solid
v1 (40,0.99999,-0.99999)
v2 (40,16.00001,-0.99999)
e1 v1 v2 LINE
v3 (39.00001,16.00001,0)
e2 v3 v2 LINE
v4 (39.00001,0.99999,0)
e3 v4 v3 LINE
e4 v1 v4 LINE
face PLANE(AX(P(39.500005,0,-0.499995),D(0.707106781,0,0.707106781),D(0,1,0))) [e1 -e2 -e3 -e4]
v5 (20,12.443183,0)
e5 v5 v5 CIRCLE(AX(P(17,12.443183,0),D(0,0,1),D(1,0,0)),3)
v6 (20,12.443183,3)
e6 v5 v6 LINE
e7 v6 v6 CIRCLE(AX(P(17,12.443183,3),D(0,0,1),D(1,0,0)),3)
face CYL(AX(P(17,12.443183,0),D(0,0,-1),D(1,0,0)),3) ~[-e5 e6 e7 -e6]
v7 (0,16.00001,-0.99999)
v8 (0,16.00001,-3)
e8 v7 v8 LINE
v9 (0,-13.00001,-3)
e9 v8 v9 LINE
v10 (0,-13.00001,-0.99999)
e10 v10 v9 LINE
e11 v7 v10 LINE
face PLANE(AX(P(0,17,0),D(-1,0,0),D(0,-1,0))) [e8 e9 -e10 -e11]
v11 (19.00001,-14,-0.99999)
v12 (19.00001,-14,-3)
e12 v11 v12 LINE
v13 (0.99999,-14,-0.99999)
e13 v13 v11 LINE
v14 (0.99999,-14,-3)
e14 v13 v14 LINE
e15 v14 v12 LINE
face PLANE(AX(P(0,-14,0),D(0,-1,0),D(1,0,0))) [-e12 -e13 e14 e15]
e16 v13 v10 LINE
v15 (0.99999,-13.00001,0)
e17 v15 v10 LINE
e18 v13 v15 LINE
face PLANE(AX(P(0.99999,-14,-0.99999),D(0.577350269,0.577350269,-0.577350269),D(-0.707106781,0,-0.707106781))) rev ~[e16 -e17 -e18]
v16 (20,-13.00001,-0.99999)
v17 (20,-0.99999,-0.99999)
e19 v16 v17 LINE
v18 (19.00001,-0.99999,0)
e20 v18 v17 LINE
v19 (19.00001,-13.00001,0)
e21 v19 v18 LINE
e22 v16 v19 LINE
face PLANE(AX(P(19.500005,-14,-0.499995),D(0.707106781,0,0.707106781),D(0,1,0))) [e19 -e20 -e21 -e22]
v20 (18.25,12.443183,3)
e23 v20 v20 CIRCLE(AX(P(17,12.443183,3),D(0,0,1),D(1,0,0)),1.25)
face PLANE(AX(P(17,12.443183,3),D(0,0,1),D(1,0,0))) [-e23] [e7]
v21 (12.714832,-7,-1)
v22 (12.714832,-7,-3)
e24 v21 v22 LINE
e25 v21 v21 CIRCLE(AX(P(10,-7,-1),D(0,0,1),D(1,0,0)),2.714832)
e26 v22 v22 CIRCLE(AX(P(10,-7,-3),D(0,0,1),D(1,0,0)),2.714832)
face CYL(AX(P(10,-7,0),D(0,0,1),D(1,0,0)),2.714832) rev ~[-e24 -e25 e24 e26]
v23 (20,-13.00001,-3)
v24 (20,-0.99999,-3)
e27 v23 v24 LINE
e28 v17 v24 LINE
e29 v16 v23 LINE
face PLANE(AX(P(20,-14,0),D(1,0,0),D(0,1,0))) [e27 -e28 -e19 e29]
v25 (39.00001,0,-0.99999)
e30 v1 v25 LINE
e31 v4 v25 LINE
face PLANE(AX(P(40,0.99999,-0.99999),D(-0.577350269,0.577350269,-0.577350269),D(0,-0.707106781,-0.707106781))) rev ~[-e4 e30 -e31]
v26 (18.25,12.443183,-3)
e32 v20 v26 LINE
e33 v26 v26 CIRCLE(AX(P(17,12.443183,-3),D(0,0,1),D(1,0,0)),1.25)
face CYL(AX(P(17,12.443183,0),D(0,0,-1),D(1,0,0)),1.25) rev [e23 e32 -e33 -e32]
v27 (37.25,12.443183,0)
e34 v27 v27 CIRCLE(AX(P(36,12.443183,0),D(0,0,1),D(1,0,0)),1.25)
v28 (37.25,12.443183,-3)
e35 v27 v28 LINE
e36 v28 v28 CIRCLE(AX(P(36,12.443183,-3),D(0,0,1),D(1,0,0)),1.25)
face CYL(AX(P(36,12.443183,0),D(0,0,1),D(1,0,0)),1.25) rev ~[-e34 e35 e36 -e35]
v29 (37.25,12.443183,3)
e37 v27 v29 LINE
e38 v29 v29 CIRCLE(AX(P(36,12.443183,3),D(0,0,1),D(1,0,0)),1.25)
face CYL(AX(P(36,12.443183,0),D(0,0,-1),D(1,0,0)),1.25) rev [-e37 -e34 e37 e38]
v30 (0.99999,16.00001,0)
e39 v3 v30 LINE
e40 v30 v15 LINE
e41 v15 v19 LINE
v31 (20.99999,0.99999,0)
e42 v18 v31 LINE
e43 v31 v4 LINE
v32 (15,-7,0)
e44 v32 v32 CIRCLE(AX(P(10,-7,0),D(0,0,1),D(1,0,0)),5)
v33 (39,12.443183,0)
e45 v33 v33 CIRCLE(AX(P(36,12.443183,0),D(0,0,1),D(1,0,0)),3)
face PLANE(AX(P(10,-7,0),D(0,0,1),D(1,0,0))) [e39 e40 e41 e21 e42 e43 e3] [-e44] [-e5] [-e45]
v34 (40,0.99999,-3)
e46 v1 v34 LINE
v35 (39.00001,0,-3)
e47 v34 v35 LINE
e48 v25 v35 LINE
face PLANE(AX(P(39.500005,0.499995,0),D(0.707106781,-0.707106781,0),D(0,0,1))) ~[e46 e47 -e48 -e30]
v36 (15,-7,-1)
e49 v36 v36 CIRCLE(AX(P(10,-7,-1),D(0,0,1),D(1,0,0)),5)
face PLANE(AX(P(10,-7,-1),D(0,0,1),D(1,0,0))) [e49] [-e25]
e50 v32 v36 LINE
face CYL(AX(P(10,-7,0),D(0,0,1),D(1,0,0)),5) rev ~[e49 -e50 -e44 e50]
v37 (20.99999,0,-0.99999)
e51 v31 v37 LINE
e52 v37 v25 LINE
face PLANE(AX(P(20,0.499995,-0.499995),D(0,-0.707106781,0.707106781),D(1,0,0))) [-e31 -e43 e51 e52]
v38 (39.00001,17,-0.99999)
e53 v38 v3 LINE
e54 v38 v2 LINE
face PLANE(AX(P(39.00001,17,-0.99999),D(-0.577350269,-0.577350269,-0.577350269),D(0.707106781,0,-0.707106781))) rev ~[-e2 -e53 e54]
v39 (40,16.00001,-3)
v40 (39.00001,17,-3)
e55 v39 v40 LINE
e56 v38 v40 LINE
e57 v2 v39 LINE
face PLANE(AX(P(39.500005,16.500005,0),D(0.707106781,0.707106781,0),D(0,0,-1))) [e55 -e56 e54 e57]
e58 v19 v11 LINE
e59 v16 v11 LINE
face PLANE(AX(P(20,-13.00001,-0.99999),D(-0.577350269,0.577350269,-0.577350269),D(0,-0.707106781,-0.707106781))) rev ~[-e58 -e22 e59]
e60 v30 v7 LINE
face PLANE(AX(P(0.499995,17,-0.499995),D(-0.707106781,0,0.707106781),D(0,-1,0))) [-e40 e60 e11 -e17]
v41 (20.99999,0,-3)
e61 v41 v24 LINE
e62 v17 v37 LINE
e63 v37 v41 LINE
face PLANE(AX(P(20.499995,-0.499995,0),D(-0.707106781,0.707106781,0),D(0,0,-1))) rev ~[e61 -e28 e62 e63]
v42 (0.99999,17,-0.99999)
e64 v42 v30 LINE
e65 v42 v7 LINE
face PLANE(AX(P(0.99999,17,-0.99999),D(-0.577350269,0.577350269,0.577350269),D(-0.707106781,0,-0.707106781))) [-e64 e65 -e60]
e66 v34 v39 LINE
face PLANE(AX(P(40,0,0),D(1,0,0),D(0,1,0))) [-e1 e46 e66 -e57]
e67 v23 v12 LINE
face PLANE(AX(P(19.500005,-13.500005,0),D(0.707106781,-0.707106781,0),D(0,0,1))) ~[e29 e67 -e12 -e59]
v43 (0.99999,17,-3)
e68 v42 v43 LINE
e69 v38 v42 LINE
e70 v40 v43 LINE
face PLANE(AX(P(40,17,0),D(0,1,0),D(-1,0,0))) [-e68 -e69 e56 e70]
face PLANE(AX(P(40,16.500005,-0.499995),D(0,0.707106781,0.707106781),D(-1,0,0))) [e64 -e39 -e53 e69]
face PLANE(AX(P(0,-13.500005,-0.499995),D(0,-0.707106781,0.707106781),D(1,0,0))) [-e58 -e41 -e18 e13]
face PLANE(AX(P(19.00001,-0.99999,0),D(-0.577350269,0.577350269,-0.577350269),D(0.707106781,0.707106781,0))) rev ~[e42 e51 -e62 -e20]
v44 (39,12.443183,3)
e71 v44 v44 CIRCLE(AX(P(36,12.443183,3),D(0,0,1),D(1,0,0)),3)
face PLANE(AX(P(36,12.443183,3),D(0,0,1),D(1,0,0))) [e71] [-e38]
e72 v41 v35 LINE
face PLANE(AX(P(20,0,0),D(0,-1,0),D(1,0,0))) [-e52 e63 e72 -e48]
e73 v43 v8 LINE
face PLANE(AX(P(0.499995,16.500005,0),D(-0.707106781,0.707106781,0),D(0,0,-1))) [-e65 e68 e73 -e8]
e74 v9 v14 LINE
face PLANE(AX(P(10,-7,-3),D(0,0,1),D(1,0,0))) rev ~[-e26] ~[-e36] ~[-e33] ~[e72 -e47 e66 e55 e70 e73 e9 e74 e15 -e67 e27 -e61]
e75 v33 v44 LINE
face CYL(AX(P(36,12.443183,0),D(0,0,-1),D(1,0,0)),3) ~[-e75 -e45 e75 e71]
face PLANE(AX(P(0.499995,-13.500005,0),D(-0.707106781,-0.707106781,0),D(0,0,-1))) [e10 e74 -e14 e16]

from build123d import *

# Parameters (mm, degrees)
F0_W     = 20
F0_H     = 14
F0_R     = 2.7148316461
F0_R_2   = 3
F0_R_3   = 1.25
F1_DEPTH = 3
F2_R     = 5
F2_R_2   = 2.7148316461
F3_DEPTH = 1
F4_DEPTH = 3
F5_SIZE  = 0.99999


# Not quite as in the source:
# - a fillet or chamfer is up to 0.001 mm smaller than in the source, because OpenCascade refuses the exact size


with BuildPart() as f1:
    # F0 (on Top) → F1 (new body)
    with BuildSketch(Plane.XY):
        with Locations((10, -7)):
            Rectangle(F0_W, F0_H)
        with Locations((10, -7)):
            Circle(F0_R, mode=Mode.SUBTRACT)
        Polygon((0, 17), (0, 0), (20, 0), (40, 0), (40, 17), align=None)
        with Locations((17, 12.44318299)):
            Circle(F0_R_2, mode=Mode.SUBTRACT)
        with Locations((36, 12.44318299)):
            Circle(F0_R_2, mode=Mode.SUBTRACT)
        with Locations((36, 12.44318299)):
            Circle(F0_R_2)
        with Locations((36, 12.44318299)):
            Circle(F0_R_3, mode=Mode.SUBTRACT)
        with Locations((17, 12.44318299)):
            Circle(F0_R_2)
        with Locations((17, 12.44318299)):
            Circle(F0_R_3, mode=Mode.SUBTRACT)
    extrude(amount=-F1_DEPTH)

    # F2 (on face) → F3 (cut)
    with BuildSketch(Plane.XY):
        with Locations((10, -7)):
            Circle(F2_R)
        with Locations((10, -7)):
            Circle(F2_R_2, mode=Mode.SUBTRACT)
    extrude(amount=-F3_DEPTH, mode=Mode.SUBTRACT)

    # F0 (on Top) → F4 (join)
    with BuildSketch(Plane.XY):
        with Locations((17, 12.44318299)):
            Circle(F0_R_2)
        with Locations((17, 12.44318299)):
            Circle(F0_R_3, mode=Mode.SUBTRACT)
        with Locations((36, 12.44318299)):
            Circle(F0_R_2)
        with Locations((36, 12.44318299)):
            Circle(F0_R_3, mode=Mode.SUBTRACT)
    extrude(amount=F4_DEPTH)

    # F5 (size 1 in the source; OpenCascade refuses exactly that, so slightly less here)
    f5_edges = [f1.edges().sort_by_distance(p)[0] for p in [
        (0, 1.5, 0),
        (10, -14, 0),
        (20, -7, 0),
        (30, 0, 0),
        (40, 8.5, 0),
        (20, 17, 0),
        (40, 0, -1.5),
        (40, 17, -1.5),
        (20, -14, -1.5),
        (0, 17, -1.5),
        (0, -14, -1.5),
        (20, 0, -1.5),
    ]]
    chamfer(f5_edges, length=F5_SIZE)


solid = f1.part
